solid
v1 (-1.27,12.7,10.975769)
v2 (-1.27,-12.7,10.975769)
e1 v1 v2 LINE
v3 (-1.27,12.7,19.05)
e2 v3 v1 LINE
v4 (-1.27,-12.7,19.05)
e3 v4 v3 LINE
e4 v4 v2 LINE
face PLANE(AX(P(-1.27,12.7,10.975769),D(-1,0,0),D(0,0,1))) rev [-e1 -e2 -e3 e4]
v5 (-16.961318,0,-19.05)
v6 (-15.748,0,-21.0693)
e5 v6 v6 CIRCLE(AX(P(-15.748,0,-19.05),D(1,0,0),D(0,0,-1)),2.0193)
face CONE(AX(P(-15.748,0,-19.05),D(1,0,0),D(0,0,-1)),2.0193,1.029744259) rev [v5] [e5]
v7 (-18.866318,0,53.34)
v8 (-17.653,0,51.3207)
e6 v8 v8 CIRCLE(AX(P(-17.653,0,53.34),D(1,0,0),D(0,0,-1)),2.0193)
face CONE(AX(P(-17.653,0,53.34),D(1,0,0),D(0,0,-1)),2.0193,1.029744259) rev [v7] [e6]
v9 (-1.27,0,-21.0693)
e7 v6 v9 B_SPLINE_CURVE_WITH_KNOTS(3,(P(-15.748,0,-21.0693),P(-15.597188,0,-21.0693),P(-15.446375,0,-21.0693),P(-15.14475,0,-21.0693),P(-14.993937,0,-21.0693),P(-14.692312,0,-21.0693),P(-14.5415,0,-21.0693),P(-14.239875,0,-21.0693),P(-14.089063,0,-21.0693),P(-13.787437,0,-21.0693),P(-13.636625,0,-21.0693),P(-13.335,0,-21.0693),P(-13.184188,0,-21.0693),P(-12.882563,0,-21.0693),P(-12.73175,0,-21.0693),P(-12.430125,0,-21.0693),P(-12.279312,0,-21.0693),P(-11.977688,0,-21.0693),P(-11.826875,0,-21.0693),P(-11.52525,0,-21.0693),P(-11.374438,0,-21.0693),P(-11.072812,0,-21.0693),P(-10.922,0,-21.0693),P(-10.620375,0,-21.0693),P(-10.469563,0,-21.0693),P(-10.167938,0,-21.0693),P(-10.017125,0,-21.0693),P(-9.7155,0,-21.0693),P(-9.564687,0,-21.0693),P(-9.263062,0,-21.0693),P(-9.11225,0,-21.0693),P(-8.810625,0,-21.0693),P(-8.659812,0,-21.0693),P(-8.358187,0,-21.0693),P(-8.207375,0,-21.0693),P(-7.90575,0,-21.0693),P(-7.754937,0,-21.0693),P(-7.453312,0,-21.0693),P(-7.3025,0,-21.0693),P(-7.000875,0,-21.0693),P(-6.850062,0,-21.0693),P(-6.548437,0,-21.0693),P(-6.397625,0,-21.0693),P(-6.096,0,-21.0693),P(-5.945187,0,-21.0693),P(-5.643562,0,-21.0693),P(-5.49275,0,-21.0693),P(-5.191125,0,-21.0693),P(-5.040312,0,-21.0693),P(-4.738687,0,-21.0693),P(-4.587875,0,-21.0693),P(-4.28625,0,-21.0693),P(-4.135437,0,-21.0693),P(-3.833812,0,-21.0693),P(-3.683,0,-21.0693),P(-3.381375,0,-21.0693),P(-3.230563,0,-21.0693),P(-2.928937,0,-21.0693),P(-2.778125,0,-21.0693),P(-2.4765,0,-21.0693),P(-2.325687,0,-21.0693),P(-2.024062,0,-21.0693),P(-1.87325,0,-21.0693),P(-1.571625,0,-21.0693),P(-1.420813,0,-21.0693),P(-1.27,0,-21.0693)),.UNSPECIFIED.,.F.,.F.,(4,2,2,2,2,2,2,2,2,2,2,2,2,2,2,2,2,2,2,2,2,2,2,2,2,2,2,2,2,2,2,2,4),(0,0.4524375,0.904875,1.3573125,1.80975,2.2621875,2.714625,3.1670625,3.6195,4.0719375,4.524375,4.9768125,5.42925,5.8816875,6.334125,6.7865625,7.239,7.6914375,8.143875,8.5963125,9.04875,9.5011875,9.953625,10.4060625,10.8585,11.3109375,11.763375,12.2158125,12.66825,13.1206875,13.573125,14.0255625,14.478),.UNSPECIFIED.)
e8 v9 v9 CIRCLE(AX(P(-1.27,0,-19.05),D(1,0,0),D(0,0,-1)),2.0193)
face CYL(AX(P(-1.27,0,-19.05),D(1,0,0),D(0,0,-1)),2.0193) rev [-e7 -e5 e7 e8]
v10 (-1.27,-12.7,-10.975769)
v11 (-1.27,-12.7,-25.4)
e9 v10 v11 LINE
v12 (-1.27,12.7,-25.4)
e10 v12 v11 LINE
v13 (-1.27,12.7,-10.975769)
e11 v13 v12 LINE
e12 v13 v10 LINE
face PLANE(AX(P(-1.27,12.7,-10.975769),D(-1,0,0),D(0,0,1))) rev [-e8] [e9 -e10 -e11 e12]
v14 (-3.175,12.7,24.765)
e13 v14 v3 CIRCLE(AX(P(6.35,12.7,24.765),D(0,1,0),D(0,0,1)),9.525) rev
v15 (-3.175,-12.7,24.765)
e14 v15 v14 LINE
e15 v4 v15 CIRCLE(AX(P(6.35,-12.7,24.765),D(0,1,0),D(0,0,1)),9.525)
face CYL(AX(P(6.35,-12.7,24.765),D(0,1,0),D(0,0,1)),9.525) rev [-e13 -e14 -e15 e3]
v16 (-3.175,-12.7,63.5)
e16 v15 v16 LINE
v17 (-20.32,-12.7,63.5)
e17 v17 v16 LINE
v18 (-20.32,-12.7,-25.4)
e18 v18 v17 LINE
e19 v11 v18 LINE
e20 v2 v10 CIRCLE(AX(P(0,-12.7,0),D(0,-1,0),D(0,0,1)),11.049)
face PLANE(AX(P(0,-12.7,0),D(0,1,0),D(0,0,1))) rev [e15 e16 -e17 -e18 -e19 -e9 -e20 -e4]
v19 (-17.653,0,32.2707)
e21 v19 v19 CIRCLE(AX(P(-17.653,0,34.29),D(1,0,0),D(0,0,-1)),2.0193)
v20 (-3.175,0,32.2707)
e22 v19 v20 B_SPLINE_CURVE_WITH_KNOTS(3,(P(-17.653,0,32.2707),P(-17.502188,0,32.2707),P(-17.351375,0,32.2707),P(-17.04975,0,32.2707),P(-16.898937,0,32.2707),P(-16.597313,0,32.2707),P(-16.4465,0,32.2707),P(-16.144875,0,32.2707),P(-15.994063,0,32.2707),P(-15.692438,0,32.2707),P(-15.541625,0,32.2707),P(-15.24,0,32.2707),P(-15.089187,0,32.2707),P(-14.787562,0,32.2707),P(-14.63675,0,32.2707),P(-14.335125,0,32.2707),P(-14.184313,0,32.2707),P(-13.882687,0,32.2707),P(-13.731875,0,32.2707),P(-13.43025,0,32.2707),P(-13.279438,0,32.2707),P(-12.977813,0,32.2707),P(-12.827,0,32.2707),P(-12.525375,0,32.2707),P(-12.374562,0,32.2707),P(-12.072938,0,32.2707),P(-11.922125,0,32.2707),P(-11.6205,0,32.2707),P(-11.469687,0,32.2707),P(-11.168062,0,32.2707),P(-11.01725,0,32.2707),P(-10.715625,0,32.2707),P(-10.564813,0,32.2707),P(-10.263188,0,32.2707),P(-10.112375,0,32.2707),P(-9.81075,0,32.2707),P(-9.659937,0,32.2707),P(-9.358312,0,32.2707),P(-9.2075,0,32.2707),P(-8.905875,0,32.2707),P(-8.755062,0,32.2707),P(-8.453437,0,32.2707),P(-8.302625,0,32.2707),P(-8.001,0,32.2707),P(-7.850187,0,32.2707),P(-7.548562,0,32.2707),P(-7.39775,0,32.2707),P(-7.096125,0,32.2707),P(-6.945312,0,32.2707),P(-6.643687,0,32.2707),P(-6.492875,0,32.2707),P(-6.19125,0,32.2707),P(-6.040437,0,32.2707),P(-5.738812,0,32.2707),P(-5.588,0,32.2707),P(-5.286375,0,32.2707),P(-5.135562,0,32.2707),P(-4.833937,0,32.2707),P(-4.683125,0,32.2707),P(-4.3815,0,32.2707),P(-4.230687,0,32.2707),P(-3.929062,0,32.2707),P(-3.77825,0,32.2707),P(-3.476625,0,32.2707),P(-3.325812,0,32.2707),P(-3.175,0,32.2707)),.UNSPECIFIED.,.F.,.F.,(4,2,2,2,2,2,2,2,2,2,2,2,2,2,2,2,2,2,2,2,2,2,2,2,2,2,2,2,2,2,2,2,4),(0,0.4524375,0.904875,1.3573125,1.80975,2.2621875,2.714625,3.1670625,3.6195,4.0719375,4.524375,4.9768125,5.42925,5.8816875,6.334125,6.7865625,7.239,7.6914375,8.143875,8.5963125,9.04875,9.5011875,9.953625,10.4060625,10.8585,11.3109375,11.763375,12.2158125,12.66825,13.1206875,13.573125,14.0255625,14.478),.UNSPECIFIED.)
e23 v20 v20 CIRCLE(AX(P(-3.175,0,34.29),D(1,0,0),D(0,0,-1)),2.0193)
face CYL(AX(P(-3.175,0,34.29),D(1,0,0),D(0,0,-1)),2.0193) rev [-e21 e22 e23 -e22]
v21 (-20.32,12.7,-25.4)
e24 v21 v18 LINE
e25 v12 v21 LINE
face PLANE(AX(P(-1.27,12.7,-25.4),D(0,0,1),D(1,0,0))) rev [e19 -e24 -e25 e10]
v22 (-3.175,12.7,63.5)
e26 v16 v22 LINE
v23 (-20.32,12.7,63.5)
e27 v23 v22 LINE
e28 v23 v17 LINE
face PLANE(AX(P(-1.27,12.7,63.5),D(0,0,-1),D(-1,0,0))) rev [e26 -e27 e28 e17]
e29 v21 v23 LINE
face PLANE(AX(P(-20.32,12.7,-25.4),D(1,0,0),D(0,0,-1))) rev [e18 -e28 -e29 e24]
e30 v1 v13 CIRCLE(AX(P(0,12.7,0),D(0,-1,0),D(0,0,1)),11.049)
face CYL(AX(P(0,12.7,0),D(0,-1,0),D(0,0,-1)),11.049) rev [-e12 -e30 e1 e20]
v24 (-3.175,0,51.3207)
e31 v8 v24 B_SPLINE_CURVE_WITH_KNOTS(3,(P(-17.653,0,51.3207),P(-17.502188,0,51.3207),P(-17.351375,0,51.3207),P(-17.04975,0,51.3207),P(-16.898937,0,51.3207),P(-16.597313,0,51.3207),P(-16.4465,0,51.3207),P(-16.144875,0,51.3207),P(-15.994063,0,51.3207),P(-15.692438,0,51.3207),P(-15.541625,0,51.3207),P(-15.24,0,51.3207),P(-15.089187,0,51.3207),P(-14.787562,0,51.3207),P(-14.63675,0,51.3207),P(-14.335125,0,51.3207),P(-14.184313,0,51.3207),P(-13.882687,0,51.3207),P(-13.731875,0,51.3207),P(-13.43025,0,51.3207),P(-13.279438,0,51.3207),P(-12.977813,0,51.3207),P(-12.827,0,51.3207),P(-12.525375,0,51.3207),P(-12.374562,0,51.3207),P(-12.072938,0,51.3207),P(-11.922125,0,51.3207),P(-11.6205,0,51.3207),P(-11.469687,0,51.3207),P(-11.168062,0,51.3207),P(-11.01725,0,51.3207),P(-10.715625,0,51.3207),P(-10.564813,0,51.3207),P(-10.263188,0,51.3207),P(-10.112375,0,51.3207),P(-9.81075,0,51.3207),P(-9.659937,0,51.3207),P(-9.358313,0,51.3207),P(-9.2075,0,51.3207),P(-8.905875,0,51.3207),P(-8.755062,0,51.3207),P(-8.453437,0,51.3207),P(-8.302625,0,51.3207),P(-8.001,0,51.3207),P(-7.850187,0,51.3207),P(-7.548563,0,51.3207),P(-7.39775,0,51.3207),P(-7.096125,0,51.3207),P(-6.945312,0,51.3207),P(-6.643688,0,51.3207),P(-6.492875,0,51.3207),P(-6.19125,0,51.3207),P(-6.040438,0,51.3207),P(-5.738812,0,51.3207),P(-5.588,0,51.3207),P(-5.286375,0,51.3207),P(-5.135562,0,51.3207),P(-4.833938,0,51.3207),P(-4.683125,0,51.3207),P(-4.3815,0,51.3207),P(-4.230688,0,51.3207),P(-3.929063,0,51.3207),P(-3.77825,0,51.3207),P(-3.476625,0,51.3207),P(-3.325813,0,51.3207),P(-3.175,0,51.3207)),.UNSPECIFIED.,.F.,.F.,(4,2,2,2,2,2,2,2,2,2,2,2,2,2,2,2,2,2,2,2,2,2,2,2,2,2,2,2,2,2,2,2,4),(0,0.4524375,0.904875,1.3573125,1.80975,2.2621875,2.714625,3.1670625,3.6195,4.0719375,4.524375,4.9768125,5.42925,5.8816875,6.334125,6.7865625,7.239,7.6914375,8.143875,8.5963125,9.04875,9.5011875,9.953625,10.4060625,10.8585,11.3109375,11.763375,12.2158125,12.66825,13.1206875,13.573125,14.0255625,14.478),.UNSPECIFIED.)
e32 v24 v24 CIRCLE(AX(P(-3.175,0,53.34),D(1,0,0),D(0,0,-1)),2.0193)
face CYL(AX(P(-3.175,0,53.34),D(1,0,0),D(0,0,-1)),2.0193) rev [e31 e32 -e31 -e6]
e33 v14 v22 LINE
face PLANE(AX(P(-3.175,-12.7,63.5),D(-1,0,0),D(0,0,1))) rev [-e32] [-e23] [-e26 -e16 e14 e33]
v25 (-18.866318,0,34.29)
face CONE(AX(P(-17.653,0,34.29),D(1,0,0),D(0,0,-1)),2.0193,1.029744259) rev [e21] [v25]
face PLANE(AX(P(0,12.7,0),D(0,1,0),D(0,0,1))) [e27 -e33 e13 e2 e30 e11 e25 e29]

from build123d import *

# Parameters (mm, degrees)
BOSS_EXTRUDE1_DEPTH        = 12.7
SKETCH7_W                  = 1.905
SKETCH7_H                  = 44.45
CUT_EXTRUDE1_DEPTH         = 72.346425278
FILLET1_R                  = 9.525
F_10_32_TAPPED_HOLE1_D     = 4.0386
F_10_32_TAPPED_HOLE1_DEPTH = 14.478
F_10_32_TAPPED_HOLE1_TIP   = 1.213317848
F_10_32_TAPPED_HOLE2_D     = 4.0386
F_10_32_TAPPED_HOLE2_DEPTH = 14.478
F_10_32_TAPPED_HOLE2_TIP   = 1.213317848


with BuildPart() as part:
    # Sketch1 → Boss-Extrude1 (new, symmetric)
    with BuildSketch(Plane(origin=(0, 0, 0), x_dir=(1, 0, 0), z_dir=(0, 1, 0))):
        with BuildLine():
            Line((-1.27, 10.975768811), (-1.27, 25.4))
            Line((-1.27, 25.4), (-20.32, 25.4))
            Line((-20.32, 25.4), (-20.32, -63.5))
            Line((-20.32, -63.5), (-1.27, -63.5))
            Line((-1.27, -63.5), (-1.27, -10.975768811))
            ThreePointArc((-1.27, -10.975768811), (-11.049, 0), (-1.27, 10.975768811))
        make_face()
    extrude(amount=BOSS_EXTRUDE1_DEPTH, both=True)

    # Sketch7 → Cut-Extrude1 (cut, through all)
    with BuildSketch(Plane(origin=(0, 12.7, 0), x_dir=(1, 0, 0), z_dir=(0, 1, 0))):
        with Locations((-2.2225, -41.275)):
            Rectangle(SKETCH7_W, SKETCH7_H)
    extrude(amount=-CUT_EXTRUDE1_DEPTH, mode=Mode.SUBTRACT)

    # Fillet1
    # the kernel refuses this fillet: 9.525 mm, written as the material it adds along each edge
    with BuildSketch(Plane(origin=(-3.175, 12.7, 19.05), x_dir=(1, 0, 0), z_dir=(0, -1, 0))) as fillet1_piece_1:
        with BuildLine():
            CenterArc((9.525, 5.715), FILLET1_R, 180, 36.869897646)
            Line((0, 5.715), (-0.1905, 5.715))
            Line((-0.1905, 5.715), (-0.1905, 0))
            Line((-0.1905, 0), (0, -0.1905))
            ThreePointArc((0, -0.1905), (0.9525, -0.1905), (1.7526, -0.1143))
            Line((1.7526, -0.1143), (1.905, 0))
        make_face()
    extrude(amount=25.4)

    # #10-32 Tapped Hole1
    with Locations(Plane(origin=(-3.175, 0, 0), x_dir=(0, 0, -1), z_dir=(1, 0, 0))):
        with Locations((-53.34, 0), (-34.29, 0)):
            Hole(F_10_32_TAPPED_HOLE1_D / 2, depth=F_10_32_TAPPED_HOLE1_DEPTH)
            with Locations((0, 0, -(F_10_32_TAPPED_HOLE1_DEPTH + F_10_32_TAPPED_HOLE1_TIP / 2))):  # 118° drill point
                Cone(0, F_10_32_TAPPED_HOLE1_D / 2, F_10_32_TAPPED_HOLE1_TIP, mode=Mode.SUBTRACT)

    # #10-32 Tapped Hole2
    with Locations(Plane(origin=(-1.27, 0, 0), x_dir=(0, 0, -1), z_dir=(1, 0, 0))):
        with Locations((19.05, 0)):
            Hole(F_10_32_TAPPED_HOLE2_D / 2, depth=F_10_32_TAPPED_HOLE2_DEPTH)
            with Locations((0, 0, -(F_10_32_TAPPED_HOLE2_DEPTH + F_10_32_TAPPED_HOLE2_TIP / 2))):  # 118° drill point
                Cone(0, F_10_32_TAPPED_HOLE2_D / 2, F_10_32_TAPPED_HOLE2_TIP, mode=Mode.SUBTRACT)


solid = part.part
